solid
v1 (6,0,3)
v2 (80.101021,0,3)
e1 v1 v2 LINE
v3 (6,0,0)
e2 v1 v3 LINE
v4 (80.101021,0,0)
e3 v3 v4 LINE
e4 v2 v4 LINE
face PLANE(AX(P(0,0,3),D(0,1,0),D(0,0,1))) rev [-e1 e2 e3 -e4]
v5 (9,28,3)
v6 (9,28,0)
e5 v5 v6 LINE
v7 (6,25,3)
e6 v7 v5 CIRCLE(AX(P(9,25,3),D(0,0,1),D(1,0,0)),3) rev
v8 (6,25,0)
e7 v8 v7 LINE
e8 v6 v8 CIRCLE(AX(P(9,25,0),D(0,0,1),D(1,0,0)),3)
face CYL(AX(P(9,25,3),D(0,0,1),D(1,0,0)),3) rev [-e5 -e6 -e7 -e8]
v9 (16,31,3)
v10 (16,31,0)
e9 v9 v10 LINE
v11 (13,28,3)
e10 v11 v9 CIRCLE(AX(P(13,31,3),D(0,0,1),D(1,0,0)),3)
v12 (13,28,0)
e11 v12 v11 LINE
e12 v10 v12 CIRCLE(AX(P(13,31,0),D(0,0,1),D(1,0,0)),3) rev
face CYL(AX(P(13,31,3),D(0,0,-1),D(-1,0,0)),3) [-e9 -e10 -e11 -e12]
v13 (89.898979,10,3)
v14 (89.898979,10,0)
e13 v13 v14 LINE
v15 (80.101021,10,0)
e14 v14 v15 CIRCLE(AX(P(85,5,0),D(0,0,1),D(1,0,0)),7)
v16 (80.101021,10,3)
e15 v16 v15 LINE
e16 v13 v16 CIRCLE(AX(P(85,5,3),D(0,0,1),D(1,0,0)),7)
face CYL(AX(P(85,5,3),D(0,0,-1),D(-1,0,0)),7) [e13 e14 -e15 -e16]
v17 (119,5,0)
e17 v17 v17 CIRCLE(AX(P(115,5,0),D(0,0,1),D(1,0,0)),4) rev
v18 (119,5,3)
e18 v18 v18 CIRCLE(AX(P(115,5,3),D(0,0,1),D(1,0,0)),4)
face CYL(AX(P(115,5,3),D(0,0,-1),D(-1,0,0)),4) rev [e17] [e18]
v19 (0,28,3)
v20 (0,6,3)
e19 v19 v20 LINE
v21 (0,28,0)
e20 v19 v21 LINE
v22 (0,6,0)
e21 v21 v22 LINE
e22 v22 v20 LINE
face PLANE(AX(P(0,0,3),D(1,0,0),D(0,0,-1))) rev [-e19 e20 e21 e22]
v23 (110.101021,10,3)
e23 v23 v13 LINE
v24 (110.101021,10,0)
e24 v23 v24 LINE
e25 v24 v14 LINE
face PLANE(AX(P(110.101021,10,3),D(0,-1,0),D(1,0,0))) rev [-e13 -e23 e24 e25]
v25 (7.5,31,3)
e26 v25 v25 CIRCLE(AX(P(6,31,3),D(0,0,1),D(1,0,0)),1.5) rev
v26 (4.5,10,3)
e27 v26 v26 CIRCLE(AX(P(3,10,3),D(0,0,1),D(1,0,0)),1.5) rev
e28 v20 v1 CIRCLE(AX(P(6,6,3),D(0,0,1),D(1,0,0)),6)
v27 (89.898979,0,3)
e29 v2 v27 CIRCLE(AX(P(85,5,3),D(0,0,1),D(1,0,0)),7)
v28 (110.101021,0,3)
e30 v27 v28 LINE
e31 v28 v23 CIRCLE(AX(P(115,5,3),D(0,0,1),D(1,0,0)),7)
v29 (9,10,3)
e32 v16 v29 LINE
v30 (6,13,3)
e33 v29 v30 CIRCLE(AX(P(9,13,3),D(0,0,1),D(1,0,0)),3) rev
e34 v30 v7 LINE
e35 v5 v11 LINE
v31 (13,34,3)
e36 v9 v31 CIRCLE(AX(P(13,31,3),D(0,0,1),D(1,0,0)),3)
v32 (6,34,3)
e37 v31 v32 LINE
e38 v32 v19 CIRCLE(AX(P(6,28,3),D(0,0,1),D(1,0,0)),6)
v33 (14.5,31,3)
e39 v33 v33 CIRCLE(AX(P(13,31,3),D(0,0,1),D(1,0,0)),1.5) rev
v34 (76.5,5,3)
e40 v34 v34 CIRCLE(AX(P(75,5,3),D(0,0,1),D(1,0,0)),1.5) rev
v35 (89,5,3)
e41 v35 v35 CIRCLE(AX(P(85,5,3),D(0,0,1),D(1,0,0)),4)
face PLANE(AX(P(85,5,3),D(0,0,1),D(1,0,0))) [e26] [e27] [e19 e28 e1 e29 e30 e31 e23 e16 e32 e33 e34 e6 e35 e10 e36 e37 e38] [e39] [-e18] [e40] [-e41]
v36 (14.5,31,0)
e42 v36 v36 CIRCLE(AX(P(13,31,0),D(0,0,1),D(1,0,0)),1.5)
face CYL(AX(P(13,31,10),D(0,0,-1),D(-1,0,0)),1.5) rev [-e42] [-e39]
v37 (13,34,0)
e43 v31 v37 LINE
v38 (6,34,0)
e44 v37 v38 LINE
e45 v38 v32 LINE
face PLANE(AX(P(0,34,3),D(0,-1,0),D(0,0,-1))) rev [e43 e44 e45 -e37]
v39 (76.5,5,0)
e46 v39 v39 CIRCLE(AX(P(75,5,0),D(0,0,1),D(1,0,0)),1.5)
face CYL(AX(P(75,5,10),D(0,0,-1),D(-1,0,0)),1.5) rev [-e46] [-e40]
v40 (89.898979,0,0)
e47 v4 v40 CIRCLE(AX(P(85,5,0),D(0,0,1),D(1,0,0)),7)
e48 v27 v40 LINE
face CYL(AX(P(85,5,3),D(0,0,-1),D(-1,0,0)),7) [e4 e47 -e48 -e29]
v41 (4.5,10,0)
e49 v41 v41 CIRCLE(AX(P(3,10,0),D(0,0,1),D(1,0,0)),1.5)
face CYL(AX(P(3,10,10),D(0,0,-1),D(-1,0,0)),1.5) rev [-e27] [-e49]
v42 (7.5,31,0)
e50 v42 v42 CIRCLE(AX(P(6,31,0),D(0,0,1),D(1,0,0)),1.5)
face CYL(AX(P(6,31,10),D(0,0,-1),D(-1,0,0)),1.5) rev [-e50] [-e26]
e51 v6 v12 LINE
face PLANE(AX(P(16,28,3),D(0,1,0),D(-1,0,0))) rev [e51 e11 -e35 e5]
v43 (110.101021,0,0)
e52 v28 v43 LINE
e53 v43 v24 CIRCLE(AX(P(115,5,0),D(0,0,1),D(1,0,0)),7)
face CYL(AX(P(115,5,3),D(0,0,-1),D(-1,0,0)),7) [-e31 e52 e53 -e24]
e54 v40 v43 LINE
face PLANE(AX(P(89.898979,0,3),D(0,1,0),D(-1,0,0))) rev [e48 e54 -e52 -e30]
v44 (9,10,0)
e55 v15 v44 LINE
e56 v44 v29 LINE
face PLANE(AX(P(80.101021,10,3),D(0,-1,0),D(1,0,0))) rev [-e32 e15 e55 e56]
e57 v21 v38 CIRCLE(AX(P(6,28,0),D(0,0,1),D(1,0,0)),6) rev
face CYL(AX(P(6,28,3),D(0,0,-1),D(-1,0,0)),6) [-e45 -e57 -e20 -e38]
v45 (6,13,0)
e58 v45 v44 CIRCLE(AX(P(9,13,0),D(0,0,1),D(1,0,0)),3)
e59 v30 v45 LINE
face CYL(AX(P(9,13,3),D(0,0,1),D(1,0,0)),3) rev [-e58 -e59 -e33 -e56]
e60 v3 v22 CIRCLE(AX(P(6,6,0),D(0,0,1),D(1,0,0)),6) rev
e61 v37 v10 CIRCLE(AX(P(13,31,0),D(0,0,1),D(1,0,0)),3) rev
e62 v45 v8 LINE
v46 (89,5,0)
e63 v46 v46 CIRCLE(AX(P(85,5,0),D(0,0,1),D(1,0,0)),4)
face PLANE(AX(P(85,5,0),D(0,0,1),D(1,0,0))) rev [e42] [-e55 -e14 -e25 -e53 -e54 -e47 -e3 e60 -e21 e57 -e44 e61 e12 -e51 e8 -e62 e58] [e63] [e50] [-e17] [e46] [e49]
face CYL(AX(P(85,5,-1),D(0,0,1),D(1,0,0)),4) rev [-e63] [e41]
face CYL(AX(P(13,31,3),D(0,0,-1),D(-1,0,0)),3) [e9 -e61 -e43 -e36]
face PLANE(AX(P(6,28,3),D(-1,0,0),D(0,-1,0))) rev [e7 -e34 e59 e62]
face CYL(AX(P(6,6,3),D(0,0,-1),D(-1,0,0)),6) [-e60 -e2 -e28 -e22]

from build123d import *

# Parameters (mm, degrees)
EXTRUDE_1_DEPTH     = 3
CUT_EXTRUDE_START   = -4
SKETCH_3_R          = 4
CUT_EXTRUDE_1_DEPTH = 131.684647847
FILLET_START        = -1
FILLET_1_DEPTH      = 5
FILLET_1_2_DEPTH    = 3
FILLET_2_R          = 6
SKETCH_4_R          = 4
CUT_EXTRUDE_2_DEPTH = 4
SKETCH_5_R          = 1.5
CUT_EXTRUDE_4_DEPTH = 10


with BuildPart() as part:
    # 草图1 → 凸台-拉伸1 (new body)
    with BuildSketch(Plane.XY):
        with BuildLine():
            Line((0, 0), (80.101020514, 0))
            ThreePointArc((80.101020514, 0), (85, -2), (89.898979486, 0))
            Line((89.898979486, 0), (110.101020514, 0))
            ThreePointArc((110.101020514, 0), (122, 5), (110.101020514, 10))
            Line((110.101020514, 10), (89.898979486, 10))
            ThreePointArc((89.898979486, 10), (85, 12), (80.101020514, 10))
            Line((80.101020514, 10), (6, 10))
            Line((6, 10), (6, 28))
            Line((6, 28), (16, 28))
            Line((16, 28), (16, 34))
            Line((16, 34), (0, 34))
            Line((0, 34), (0, 0))
        make_face()
    extrude(amount=EXTRUDE_1_DEPTH)

    # 草图3 → 切除-拉伸1 (cut, through all)
    with BuildSketch(Plane.XY.offset(3).offset(CUT_EXTRUDE_START)):
        with Locations((115, 5)):
            Circle(SKETCH_3_R)
    extrude(amount=CUT_EXTRUDE_1_DEPTH, mode=Mode.SUBTRACT)

    # 圆角1: read off the stored shape, not the designer's step
    # 圆角1 outline → 圆角1 (cut)
    with BuildSketch(Plane.XY.offset(FILLET_START)):
        with BuildLine():
            ThreePointArc((13, 34), (15.121320344, 33.121320344), (16, 31))
            Line((16, 31), (16, 34))
            Line((16, 34), (13, 34))
        make_face()
        with BuildLine():
            ThreePointArc((16, 31), (15.121320344, 28.878679656), (13, 28))
            Line((13, 28), (16, 28))
            Line((16, 28), (16, 31))
        make_face()
    extrude(amount=FILLET_1_DEPTH, mode=Mode.SUBTRACT)

    # Fillet 1 2 outline → Fillet 1 2 (add)
    with BuildSketch(Plane.XY):
        with BuildLine():
            Line((6, 28), (6, 25))
            ThreePointArc((6, 25), (6.878679656, 27.121320344), (9, 28))
            Line((9, 28), (6, 28))
        make_face()
        with BuildLine():
            ThreePointArc((9, 10), (6.878679656, 10.878679656), (6, 13))
            Line((6, 13), (6, 10))
            Line((6, 10), (9, 10))
        make_face()
    extrude(amount=FILLET_1_2_DEPTH)

    # 圆角2
    fillet_2_edges = [part.edges().sort_by_distance(p)[0] for p in [
        (0, 34, 1.5),
        (0, 0, 1.5),
    ]]
    fillet(fillet_2_edges, radius=FILLET_2_R)

    # 草图4 → 切除-拉伸2 (cut)
    with BuildSketch(Plane.XY.offset(3)):
        with Locations((85, 5)):
            Circle(SKETCH_4_R)
    extrude(amount=-CUT_EXTRUDE_2_DEPTH, mode=Mode.SUBTRACT)

    # 草图5 → 切除-拉伸4 (cut)
    with BuildSketch(Plane.XY):
        with Locations((75, 5)):
            Circle(SKETCH_5_R)
        with Locations((3, 10)):
            Circle(SKETCH_5_R)
        with Locations((13, 31)):
            Circle(SKETCH_5_R)
        with Locations((6, 31)):
            Circle(SKETCH_5_R)
    extrude(amount=CUT_EXTRUDE_4_DEPTH, mode=Mode.SUBTRACT)


solid = part.part
